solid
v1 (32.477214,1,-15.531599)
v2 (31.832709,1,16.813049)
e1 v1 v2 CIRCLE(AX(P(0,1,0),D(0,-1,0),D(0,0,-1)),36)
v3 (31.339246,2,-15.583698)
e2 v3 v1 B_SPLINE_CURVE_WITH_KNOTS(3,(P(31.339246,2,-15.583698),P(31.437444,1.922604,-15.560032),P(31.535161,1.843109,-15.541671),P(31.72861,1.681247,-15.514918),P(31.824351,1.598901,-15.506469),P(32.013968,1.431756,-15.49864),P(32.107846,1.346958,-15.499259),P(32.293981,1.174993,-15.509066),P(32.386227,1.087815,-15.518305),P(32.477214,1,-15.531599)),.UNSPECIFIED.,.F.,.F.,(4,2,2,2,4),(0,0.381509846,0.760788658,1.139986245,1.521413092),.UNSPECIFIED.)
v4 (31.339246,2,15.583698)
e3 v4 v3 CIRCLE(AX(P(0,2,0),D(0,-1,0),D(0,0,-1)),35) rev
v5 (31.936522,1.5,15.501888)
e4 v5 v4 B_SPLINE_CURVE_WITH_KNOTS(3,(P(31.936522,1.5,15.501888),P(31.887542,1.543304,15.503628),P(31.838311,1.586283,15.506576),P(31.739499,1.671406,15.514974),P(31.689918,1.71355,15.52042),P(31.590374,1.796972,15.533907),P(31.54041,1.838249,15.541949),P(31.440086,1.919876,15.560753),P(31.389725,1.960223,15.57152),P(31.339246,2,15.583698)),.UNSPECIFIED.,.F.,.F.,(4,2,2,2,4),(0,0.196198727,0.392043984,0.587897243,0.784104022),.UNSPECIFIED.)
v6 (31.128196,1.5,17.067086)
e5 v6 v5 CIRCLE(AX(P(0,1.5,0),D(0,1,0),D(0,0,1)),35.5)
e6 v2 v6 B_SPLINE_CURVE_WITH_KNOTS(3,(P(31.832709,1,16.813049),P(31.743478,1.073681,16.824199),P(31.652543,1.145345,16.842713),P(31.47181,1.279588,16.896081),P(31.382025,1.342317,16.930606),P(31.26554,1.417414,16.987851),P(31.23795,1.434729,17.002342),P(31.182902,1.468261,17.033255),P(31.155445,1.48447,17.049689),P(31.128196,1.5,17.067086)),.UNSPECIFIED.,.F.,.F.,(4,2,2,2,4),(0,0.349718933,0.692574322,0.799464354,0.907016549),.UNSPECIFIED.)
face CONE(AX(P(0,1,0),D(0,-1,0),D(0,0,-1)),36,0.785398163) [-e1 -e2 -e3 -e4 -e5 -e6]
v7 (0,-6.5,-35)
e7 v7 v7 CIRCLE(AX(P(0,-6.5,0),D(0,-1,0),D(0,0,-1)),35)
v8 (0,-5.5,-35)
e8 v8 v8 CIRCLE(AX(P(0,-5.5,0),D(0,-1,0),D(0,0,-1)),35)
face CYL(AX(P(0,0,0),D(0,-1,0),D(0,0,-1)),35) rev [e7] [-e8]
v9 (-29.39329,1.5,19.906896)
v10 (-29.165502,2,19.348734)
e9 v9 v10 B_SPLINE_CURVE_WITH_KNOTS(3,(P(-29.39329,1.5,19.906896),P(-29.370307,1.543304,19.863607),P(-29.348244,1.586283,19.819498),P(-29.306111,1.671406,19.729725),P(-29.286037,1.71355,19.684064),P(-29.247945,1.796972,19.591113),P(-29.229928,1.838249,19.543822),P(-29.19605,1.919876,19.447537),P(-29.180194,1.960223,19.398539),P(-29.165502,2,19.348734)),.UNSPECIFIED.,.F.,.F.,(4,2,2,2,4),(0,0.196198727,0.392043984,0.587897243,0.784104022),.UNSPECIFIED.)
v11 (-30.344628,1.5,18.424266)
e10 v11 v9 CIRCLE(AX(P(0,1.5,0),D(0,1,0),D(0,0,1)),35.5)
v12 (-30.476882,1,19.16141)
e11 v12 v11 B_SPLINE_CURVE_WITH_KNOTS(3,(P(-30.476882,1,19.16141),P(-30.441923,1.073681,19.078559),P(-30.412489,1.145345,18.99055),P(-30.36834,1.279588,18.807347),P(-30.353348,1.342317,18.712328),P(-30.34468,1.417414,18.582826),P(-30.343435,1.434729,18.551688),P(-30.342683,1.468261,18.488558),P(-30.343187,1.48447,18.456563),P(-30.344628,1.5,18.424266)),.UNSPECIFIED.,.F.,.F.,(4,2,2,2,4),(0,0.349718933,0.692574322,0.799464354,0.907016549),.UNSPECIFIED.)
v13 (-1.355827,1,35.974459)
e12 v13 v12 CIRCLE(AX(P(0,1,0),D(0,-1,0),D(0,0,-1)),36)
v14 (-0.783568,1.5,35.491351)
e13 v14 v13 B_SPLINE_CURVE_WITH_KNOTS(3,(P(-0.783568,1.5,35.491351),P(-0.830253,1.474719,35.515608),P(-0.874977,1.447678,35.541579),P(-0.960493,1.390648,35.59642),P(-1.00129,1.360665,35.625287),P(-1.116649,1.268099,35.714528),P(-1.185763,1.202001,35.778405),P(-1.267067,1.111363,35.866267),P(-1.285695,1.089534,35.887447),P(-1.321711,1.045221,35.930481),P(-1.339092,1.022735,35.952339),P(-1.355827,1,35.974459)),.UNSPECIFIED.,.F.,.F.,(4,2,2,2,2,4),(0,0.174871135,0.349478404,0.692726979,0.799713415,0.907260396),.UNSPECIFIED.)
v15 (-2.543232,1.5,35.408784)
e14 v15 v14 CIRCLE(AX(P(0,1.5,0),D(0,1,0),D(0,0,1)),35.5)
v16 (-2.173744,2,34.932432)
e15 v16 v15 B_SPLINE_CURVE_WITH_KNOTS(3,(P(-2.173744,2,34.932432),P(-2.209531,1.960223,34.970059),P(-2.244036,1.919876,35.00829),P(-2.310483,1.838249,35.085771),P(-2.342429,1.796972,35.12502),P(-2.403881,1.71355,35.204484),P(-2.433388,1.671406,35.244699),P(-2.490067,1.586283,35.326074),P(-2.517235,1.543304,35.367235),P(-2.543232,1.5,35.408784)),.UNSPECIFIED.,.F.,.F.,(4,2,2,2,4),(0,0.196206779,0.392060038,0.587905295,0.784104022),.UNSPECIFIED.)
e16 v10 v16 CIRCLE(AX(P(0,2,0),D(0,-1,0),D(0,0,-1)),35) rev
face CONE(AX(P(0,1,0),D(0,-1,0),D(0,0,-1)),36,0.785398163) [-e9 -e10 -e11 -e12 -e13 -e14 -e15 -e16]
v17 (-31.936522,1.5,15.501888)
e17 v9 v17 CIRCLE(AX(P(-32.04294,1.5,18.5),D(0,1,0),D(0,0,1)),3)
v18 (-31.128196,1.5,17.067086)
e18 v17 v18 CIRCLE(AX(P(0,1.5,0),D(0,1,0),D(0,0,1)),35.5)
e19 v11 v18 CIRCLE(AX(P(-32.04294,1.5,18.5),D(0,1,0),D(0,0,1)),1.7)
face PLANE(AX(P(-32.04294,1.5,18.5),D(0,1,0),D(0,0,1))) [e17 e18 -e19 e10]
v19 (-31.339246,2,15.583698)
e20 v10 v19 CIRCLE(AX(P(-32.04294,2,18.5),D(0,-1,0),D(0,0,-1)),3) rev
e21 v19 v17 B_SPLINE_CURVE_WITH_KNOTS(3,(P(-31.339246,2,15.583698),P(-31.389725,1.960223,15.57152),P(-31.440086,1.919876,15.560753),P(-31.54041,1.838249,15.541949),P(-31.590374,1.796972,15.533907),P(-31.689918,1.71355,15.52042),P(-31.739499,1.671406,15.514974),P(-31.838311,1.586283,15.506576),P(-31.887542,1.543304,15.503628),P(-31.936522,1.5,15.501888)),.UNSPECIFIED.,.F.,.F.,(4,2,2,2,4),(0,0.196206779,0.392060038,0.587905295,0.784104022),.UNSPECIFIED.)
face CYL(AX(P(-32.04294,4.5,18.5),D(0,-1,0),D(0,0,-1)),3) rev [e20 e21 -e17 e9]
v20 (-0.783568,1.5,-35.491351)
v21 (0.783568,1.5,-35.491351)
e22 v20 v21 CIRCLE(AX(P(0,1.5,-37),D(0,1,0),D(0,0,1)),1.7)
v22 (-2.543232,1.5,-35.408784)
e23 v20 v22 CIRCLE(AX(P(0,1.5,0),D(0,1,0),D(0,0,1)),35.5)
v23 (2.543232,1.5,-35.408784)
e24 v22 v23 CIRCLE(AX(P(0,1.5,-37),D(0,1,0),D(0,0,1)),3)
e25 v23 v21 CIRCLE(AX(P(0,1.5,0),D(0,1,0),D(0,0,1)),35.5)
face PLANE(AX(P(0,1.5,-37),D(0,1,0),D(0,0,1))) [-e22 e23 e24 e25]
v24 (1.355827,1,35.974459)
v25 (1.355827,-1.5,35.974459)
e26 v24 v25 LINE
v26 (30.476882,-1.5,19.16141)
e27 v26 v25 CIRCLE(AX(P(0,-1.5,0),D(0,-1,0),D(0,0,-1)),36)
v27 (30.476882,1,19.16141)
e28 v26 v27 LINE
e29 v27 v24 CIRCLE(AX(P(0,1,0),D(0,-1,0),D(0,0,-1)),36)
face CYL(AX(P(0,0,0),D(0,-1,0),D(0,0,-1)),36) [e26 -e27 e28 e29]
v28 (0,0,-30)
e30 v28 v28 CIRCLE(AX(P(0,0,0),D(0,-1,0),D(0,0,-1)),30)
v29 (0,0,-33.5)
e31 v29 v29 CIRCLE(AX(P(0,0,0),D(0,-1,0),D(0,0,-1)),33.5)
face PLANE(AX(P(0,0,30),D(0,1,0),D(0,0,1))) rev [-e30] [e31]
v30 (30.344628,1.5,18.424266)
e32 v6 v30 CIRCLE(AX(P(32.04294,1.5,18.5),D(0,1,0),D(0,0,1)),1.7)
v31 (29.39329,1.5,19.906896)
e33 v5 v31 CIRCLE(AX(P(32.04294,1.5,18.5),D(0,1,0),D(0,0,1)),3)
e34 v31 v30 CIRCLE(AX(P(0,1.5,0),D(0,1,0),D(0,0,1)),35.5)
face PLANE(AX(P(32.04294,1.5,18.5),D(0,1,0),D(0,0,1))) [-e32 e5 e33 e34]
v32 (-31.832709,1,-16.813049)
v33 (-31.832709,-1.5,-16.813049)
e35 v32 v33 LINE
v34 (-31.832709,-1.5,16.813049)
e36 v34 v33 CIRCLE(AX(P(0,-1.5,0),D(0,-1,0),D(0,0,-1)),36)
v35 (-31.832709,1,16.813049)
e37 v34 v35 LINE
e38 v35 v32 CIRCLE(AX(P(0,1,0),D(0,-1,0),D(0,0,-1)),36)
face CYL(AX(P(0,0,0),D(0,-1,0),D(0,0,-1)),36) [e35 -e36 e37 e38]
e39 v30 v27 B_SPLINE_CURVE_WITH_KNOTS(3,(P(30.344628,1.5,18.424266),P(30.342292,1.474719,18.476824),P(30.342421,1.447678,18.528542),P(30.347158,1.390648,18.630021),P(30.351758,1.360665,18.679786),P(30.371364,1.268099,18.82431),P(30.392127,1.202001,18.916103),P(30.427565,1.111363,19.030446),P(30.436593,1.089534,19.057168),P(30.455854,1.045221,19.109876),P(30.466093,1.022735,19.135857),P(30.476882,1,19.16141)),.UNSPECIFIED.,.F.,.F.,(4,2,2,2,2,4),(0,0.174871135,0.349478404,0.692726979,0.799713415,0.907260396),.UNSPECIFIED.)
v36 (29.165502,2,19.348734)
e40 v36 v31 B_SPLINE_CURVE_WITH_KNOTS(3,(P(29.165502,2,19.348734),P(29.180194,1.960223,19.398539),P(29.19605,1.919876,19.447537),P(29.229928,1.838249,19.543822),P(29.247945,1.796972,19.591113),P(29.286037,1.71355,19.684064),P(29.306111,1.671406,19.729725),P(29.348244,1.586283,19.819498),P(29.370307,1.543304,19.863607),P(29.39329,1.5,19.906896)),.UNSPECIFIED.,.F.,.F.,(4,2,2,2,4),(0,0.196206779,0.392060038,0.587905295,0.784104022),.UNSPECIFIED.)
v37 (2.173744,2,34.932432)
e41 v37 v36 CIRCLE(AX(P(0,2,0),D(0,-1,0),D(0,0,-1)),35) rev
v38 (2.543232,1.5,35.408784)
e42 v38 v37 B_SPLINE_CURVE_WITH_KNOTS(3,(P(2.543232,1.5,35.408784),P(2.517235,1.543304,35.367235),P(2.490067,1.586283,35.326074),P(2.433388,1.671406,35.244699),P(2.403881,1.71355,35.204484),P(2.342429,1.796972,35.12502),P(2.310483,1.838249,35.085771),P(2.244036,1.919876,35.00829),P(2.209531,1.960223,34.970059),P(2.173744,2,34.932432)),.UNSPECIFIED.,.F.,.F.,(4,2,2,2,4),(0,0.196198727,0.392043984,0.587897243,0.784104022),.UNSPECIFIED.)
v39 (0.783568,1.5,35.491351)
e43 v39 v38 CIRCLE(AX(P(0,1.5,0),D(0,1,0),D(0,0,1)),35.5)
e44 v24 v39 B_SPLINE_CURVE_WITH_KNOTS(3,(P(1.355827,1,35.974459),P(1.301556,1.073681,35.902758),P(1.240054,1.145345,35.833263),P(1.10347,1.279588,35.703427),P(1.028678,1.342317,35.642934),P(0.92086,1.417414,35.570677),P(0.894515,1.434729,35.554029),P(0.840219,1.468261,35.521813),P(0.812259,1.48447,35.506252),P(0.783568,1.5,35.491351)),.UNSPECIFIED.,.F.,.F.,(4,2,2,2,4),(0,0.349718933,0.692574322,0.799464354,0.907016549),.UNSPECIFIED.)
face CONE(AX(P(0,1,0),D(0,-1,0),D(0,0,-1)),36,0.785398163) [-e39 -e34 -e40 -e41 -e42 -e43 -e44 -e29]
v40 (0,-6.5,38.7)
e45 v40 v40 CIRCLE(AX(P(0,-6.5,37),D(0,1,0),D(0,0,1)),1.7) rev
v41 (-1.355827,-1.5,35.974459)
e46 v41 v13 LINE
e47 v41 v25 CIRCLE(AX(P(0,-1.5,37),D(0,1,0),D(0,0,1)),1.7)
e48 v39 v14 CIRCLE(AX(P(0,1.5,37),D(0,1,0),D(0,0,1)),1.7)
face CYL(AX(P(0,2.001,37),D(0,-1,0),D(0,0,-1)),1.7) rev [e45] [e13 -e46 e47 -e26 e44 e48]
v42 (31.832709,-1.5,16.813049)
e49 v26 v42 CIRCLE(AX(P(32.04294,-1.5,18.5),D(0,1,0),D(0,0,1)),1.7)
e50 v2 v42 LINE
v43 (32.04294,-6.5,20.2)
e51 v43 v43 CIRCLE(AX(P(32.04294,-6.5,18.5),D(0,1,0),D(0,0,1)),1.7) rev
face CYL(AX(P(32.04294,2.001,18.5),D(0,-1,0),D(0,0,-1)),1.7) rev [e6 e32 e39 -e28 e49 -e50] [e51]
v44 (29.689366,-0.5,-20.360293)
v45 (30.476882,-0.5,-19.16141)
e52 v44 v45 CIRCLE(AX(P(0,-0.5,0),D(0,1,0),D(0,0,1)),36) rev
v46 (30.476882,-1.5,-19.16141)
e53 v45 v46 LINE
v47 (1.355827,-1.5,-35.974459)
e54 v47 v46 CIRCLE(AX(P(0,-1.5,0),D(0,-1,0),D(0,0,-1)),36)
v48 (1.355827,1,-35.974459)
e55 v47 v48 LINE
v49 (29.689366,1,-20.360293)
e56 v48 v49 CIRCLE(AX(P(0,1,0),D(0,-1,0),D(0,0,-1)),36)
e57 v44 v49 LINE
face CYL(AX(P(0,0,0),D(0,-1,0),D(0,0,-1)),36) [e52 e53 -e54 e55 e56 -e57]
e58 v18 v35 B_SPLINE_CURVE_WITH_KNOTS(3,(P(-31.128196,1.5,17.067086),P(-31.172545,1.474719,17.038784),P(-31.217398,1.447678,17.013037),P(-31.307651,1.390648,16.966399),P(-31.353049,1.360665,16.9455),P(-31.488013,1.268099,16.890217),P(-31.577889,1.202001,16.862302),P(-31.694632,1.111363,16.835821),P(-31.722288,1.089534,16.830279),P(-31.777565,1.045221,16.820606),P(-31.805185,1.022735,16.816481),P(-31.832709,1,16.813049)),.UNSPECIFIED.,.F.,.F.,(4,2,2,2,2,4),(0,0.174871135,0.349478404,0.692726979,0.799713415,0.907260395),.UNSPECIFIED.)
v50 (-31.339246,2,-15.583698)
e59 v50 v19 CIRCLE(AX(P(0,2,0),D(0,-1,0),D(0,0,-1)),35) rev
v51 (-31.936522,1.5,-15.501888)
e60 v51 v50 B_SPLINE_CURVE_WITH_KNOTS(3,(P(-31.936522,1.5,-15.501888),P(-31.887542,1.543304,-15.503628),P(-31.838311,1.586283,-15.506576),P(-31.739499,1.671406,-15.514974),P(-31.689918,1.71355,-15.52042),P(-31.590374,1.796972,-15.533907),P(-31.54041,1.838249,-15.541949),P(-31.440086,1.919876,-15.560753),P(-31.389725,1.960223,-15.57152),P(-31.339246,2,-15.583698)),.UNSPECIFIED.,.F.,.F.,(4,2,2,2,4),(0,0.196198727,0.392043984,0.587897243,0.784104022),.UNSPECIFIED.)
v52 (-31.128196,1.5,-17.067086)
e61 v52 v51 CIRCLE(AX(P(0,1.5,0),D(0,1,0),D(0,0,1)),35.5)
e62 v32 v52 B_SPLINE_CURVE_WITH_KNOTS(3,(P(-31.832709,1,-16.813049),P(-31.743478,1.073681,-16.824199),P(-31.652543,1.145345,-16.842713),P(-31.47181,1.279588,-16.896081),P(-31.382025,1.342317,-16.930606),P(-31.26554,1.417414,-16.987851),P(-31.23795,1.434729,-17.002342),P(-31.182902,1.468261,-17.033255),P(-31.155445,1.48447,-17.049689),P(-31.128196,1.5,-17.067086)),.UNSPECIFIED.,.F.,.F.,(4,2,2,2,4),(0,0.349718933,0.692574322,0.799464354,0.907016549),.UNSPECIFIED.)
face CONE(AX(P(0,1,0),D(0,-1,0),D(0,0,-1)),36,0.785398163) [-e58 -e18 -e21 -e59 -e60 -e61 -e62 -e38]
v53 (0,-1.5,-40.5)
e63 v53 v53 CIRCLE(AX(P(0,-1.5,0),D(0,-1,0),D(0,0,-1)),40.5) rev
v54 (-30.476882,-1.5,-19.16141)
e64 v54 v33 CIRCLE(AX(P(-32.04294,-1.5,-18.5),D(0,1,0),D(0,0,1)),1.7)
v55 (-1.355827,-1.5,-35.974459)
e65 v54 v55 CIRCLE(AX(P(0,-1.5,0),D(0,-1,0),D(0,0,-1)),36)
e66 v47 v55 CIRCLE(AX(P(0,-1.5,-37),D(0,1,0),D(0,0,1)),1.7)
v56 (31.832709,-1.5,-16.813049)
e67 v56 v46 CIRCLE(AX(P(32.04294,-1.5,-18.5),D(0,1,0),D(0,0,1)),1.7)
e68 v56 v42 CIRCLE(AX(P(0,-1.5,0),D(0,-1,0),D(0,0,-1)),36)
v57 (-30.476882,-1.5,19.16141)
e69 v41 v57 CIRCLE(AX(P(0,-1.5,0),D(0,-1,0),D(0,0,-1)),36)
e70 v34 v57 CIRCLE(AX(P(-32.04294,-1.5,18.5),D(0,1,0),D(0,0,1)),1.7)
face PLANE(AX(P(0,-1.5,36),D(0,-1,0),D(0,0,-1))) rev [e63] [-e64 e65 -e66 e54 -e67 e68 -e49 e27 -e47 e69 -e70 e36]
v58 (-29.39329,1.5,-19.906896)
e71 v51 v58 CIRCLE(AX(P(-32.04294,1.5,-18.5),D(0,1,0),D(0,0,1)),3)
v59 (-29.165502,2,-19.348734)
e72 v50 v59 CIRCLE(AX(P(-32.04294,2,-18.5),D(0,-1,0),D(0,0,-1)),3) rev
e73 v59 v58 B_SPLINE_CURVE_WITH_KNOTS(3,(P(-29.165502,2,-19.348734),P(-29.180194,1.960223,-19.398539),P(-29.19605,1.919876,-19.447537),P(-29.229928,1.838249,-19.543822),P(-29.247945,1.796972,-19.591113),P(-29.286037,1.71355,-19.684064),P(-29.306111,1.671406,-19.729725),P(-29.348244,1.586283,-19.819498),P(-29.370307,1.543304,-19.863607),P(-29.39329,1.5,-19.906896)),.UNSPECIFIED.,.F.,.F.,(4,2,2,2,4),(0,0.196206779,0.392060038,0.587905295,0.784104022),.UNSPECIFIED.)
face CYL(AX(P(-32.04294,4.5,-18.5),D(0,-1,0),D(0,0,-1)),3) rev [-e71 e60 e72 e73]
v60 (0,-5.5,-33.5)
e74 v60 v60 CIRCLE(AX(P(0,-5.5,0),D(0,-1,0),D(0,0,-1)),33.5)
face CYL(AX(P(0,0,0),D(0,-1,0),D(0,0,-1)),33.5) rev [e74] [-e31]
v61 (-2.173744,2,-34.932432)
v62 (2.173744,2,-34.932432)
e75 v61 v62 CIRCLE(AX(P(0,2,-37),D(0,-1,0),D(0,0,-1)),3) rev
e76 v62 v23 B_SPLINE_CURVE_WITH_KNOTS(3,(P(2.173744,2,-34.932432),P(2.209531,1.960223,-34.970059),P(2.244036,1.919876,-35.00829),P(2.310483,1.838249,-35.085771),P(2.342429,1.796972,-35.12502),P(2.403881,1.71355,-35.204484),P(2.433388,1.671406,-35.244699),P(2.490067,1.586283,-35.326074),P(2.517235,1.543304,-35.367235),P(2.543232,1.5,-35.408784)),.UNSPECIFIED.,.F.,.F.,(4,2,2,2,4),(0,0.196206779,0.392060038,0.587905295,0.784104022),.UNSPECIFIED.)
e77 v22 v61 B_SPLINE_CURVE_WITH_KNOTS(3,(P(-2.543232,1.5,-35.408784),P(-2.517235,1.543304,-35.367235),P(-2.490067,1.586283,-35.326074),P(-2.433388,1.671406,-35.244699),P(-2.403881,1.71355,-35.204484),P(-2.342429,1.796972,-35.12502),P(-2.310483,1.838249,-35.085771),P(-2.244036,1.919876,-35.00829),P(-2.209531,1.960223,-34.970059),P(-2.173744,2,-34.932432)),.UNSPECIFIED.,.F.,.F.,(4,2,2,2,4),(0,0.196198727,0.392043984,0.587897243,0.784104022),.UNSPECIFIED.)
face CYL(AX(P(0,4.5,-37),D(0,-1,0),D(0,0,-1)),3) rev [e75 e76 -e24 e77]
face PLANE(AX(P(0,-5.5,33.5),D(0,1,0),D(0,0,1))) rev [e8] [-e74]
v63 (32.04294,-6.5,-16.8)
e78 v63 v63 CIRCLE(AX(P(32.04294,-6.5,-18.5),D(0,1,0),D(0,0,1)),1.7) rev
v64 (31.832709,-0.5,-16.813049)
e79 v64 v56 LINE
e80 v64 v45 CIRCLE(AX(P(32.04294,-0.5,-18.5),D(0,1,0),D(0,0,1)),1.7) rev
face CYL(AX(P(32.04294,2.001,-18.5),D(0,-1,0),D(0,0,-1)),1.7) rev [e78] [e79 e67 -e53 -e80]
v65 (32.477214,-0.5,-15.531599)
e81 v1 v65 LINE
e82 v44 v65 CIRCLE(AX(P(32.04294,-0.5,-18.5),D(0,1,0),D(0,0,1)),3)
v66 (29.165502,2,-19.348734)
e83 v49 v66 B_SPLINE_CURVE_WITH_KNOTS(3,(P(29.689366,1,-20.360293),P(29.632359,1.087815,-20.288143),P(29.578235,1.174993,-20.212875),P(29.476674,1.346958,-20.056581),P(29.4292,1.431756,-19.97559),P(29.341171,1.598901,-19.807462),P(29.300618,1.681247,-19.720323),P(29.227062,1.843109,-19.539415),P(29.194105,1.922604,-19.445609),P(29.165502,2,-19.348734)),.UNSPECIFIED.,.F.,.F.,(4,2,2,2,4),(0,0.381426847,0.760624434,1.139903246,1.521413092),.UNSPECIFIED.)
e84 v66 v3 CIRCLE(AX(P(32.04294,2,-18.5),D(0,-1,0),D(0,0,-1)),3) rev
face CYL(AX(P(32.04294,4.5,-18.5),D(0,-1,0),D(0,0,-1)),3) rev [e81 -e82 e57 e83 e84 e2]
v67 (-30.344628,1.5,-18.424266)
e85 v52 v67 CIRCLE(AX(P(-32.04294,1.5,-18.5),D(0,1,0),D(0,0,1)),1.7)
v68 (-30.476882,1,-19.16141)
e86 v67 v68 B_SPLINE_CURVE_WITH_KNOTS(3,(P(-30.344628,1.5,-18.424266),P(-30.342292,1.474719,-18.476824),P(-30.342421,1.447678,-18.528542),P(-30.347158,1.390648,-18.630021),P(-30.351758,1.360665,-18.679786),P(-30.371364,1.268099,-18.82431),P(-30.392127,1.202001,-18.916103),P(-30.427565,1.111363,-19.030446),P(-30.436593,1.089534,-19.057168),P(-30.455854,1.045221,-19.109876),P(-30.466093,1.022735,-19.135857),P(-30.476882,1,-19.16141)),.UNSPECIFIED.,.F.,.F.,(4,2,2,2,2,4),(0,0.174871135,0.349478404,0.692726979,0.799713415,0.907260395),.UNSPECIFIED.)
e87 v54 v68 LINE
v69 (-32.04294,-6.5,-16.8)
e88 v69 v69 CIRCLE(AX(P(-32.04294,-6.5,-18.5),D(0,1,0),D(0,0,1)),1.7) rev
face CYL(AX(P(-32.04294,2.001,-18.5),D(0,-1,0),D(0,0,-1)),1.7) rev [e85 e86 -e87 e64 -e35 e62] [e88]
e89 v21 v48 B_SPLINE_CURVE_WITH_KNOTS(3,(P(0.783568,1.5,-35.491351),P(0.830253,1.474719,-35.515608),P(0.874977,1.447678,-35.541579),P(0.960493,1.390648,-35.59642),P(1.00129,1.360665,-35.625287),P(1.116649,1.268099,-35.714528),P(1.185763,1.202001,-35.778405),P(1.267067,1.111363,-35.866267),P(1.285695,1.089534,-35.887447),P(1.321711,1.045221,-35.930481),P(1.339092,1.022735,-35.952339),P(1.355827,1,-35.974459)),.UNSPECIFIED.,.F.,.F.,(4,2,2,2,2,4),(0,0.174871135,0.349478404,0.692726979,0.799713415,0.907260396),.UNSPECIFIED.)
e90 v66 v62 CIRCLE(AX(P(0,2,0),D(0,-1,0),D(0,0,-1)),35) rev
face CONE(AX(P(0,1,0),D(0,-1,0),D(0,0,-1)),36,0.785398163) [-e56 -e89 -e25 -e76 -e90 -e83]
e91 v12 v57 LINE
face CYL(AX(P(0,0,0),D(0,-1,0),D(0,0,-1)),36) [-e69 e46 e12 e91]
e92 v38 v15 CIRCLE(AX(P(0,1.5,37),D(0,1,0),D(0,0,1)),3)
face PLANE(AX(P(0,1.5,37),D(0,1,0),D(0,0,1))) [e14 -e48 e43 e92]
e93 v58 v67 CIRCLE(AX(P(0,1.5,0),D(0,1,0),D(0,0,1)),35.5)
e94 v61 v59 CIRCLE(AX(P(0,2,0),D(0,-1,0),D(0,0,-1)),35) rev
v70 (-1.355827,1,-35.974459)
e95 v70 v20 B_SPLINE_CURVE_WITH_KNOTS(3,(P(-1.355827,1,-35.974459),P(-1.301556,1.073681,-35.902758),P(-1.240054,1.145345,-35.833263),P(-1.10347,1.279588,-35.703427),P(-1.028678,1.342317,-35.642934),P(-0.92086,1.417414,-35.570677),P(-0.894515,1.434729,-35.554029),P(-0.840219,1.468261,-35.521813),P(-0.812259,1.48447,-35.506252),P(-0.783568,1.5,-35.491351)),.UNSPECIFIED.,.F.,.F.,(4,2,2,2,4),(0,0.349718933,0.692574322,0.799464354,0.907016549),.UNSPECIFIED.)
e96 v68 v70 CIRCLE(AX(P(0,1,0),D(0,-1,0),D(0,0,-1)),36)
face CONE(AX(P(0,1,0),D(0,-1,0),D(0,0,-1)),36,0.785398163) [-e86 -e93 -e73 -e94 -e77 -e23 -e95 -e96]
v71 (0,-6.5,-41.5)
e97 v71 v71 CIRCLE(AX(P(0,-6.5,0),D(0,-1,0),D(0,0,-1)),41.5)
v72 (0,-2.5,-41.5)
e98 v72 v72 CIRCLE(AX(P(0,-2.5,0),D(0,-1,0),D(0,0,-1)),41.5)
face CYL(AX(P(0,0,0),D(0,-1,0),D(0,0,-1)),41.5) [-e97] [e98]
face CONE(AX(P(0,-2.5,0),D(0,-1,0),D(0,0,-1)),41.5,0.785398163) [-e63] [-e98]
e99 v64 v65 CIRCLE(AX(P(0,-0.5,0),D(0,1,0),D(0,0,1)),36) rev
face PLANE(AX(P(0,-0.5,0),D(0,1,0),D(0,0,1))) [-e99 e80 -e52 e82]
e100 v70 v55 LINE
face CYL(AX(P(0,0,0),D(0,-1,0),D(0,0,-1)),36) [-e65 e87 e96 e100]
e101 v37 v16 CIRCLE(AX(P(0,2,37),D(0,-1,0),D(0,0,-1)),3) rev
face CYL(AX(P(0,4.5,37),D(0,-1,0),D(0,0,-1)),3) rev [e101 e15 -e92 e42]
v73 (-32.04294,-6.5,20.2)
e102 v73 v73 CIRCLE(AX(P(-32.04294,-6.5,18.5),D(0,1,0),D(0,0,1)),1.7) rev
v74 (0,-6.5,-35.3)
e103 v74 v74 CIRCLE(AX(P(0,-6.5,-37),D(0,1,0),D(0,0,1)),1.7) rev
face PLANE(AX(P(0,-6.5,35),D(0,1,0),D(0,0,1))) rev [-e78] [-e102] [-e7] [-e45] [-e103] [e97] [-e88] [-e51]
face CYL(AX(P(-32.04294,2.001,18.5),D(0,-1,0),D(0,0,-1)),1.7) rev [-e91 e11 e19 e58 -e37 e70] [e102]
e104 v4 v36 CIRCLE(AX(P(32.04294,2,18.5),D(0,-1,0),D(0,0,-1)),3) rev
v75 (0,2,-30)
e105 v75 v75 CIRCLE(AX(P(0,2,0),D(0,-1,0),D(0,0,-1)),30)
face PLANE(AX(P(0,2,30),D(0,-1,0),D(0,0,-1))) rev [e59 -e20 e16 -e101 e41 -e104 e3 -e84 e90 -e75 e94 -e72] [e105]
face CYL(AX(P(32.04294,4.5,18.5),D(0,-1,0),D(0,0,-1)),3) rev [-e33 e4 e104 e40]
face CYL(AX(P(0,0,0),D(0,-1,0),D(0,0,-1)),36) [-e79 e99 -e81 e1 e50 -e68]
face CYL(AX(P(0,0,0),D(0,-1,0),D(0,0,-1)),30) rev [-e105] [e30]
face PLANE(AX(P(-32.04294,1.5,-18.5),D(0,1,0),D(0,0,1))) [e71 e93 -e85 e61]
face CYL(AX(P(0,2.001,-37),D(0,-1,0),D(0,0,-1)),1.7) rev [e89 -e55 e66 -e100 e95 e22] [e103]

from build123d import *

# Parameters (mm, degrees)
SKETCH_3_R                      = 1.7
CUT_EXTRUDE_1_DEPTH             = 10
CUT_EXTRUDE_1_DIRECTION_2_REACH = 60.902
CUT_EXTRUDE_START               = 3
SKETCH_4_R                      = 3
CUT_EXTRUDE_2_DEPTH             = 3
SKETCH_7_R                      = 3
CUT_EXTRUDE_3_DEPTH             = 10
EXTRUDE_1_DEPTH                 = 1
CHAMFER_1_SIZE                  = 1


with BuildPart() as part:
    # 草图2 → 旋转1 (revolve)
    with BuildSketch(Plane(origin=(0, 0, 0), x_dir=(0, 0, -1), z_dir=(1, 0, 0)), mode=Mode.PRIVATE) as revolve_1_sk:
        Polygon((-30, 0), (-30, 2), (-36, 2), (-36, -1.5), (-41.5, -1.5), (-41.5, -6.5), (-35, -6.5), (-35, -5.5), (-33.5, -5.5), (-33.5, 0), align=None)
    revolve(revolve_1_sk.sketch.rotate(Axis((0, 0, 0), (0, 1, 0)), 180), axis=Axis((0, 0, 0), (0, 1, 0)))

    # 草图3 → 切除-拉伸1 (cut)
    with BuildSketch(Plane(origin=(0, -1.5, 0), x_dir=(1, 0, 0), z_dir=(0, 1, 0))):
        with Locations(Location((0, 37, 0), (0, 0, 217.103674805))):
            Circle(SKETCH_3_R)
        with Locations(Location((32.04293994, 18.5, 0), (0, 0, 157.103674805))):
            Circle(SKETCH_3_R)
        with Locations(Location((32.04293994, -18.5, 0), (0, 0, 97.103674805))):
            Circle(SKETCH_3_R)
        with Locations(Location((0, -37, 0), (0, 0, 37.103674804))):
            Circle(SKETCH_3_R)
        with Locations(Location((-32.04293994, -18.5, 0), (0, 0, 82.896325196))):
            Circle(SKETCH_3_R)
        with Locations(Location((-32.04293994, 18.5, 0), (0, 0, 22.896325196))):
            Circle(SKETCH_3_R)
    extrude(amount=-CUT_EXTRUDE_1_DEPTH, mode=Mode.SUBTRACT)

    # 草图3 → 切除-拉伸1 direction 2 (cut, up to next)
    with BuildSketch(Plane(origin=(0, -1.5, 0), x_dir=(1, 0, 0), z_dir=(0, 1, 0)), mode=Mode.PRIVATE) as cut_extrude_1_direction_2_sk1:
        with Locations(Location((0, 37, 0), (0, 0, 217.103674805))):
            Circle(SKETCH_3_R)
    cut_extrude_1_direction_2_tool1 = extrude(cut_extrude_1_direction_2_sk1.sketch, amount=CUT_EXTRUDE_1_DIRECTION_2_REACH, mode=Mode.PRIVATE) & part.part
    # 草图3 → 切除-拉伸1 direction 2 (cut, up to next)
    with BuildSketch(Plane(origin=(0, -1.5, 0), x_dir=(1, 0, 0), z_dir=(0, 1, 0)), mode=Mode.PRIVATE) as cut_extrude_1_direction_2_sk2:
        with Locations(Location((32.04293994, 18.5, 0), (0, 0, 157.103674805))):
            Circle(SKETCH_3_R)
    cut_extrude_1_direction_2_tool2 = extrude(cut_extrude_1_direction_2_sk2.sketch, amount=CUT_EXTRUDE_1_DIRECTION_2_REACH, mode=Mode.PRIVATE) & part.part
    # 草图3 → 切除-拉伸1 direction 2 (cut, up to next)
    with BuildSketch(Plane(origin=(0, -1.5, 0), x_dir=(1, 0, 0), z_dir=(0, 1, 0)), mode=Mode.PRIVATE) as cut_extrude_1_direction_2_sk3:
        with Locations(Location((32.04293994, -18.5, 0), (0, 0, 97.103674805))):
            Circle(SKETCH_3_R)
    cut_extrude_1_direction_2_tool3 = extrude(cut_extrude_1_direction_2_sk3.sketch, amount=CUT_EXTRUDE_1_DIRECTION_2_REACH, mode=Mode.PRIVATE) & part.part
    # 草图3 → 切除-拉伸1 direction 2 (cut, up to next)
    with BuildSketch(Plane(origin=(0, -1.5, 0), x_dir=(1, 0, 0), z_dir=(0, 1, 0)), mode=Mode.PRIVATE) as cut_extrude_1_direction_2_sk4:
        with Locations(Location((0, -37, 0), (0, 0, 37.103674804))):
            Circle(SKETCH_3_R)
    cut_extrude_1_direction_2_tool4 = extrude(cut_extrude_1_direction_2_sk4.sketch, amount=CUT_EXTRUDE_1_DIRECTION_2_REACH, mode=Mode.PRIVATE) & part.part
    # 草图3 → 切除-拉伸1 direction 2 (cut, up to next)
    with BuildSketch(Plane(origin=(0, -1.5, 0), x_dir=(1, 0, 0), z_dir=(0, 1, 0)), mode=Mode.PRIVATE) as cut_extrude_1_direction_2_sk5:
        with Locations(Location((-32.04293994, -18.5, 0), (0, 0, 82.896325196))):
            Circle(SKETCH_3_R)
    cut_extrude_1_direction_2_tool5 = extrude(cut_extrude_1_direction_2_sk5.sketch, amount=CUT_EXTRUDE_1_DIRECTION_2_REACH, mode=Mode.PRIVATE) & part.part
    # 草图3 → 切除-拉伸1 direction 2 (cut, up to next)
    with BuildSketch(Plane(origin=(0, -1.5, 0), x_dir=(1, 0, 0), z_dir=(0, 1, 0)), mode=Mode.PRIVATE) as cut_extrude_1_direction_2_sk6:
        with Locations(Location((-32.04293994, 18.5, 0), (0, 0, 22.896325196))):
            Circle(SKETCH_3_R)
    cut_extrude_1_direction_2_tool6 = extrude(cut_extrude_1_direction_2_sk6.sketch, amount=CUT_EXTRUDE_1_DIRECTION_2_REACH, mode=Mode.PRIVATE) & part.part
    add(cut_extrude_1_direction_2_tool1.solids().sort_by_distance((0, -1.5, -37))[0], mode=Mode.SUBTRACT)
    add(cut_extrude_1_direction_2_tool2.solids().sort_by_distance((32.04294, -1.5, -18.5))[0], mode=Mode.SUBTRACT)
    add(cut_extrude_1_direction_2_tool3.solids().sort_by_distance((32.04294, -1.5, 18.5))[0], mode=Mode.SUBTRACT)
    add(cut_extrude_1_direction_2_tool4.solids().sort_by_distance((0, -1.5, 37))[0], mode=Mode.SUBTRACT)
    add(cut_extrude_1_direction_2_tool5.solids().sort_by_distance((-32.04294, -1.5, 18.5))[0], mode=Mode.SUBTRACT)
    add(cut_extrude_1_direction_2_tool6.solids().sort_by_distance((-32.04294, -1.5, -18.5))[0], mode=Mode.SUBTRACT)

    # 草图4 → 切除-拉伸2 (cut)
    with BuildSketch(Plane(origin=(0, -1.5, 0), x_dir=(1, 0, 0), z_dir=(0, 1, 0)).offset(CUT_EXTRUDE_START)):
        with Locations((0, 37)):
            Circle(SKETCH_4_R)
        with Locations((32.04293994, 18.5)):
            Circle(SKETCH_4_R)
        with Locations((32.04293994, -18.5)):
            Circle(SKETCH_4_R)
        with Locations((0, -37)):
            Circle(SKETCH_4_R)
        with Locations((-32.04293994, -18.5)):
            Circle(SKETCH_4_R)
        with Locations((-32.04293994, 18.5)):
            Circle(SKETCH_4_R)
    extrude(amount=CUT_EXTRUDE_2_DEPTH, mode=Mode.SUBTRACT)

    # 草图7 → 切除-拉伸3 (cut)
    with BuildSketch(Plane(origin=(0, -1.5, 0), x_dir=(1, 0, 0), z_dir=(0, 1, 0))):
        with Locations((32.04293994, 18.5)):
            Circle(SKETCH_7_R)
    extrude(amount=CUT_EXTRUDE_3_DEPTH, mode=Mode.SUBTRACT)

    # 草图8 → 凸台-拉伸1 (add)
    with BuildSketch(Plane(origin=(0, -1.5, 0), x_dir=(1, 0, 0), z_dir=(0, 1, 0))):
        with BuildLine():
            ThreePointArc((30.476882326, 19.161410274), (30.089095942, 19.764774357), (29.689366173, 20.360293128))
            ThreePointArc((29.689366173, 20.360293128), (29.444863729, 17), (32.477214164, 15.531598764))
            ThreePointArc((32.477214164, 15.531598764), (32.161344664, 16.175534285), (31.832709232, 16.813049186))
            ThreePointArc((31.832709232, 16.813049186), (30.570696754, 17.65), (30.476882326, 19.161410274))
        make_face()
    extrude(amount=EXTRUDE_1_DEPTH)

    # 倒角1
    # the kernel refuses this chamfer: 1 mm, written as the material it takes off along each edge
    with BuildSketch(Plane(origin=(0, 2, 0), x_dir=(0.00607290176343859, 0, 0.9999815597620647), z_dir=(-0.9999815597620647, 0, 0.00607290176343859))) as chamfer_1_piece_1:
        Polygon((36 - CHAMFER_1_SIZE, 0), (36, -CHAMFER_1_SIZE), (36, 0), align=None)
    revolve(axis=Axis((0, 2, 0), (0, 1, 0)), revolution_arc=59.304092442, mode=Mode.SUBTRACT)
    with BuildSketch(Plane(origin=(0, 2, 0), x_dir=(-0.8629729831882226, 0, 0.5052500670828455), z_dir=(-0.5052500670828455, 0, -0.8629729831882226))) as chamfer_1_piece_2:
        Polygon((36 - CHAMFER_1_SIZE, 0), (36, -CHAMFER_1_SIZE), (36, 0), align=None)
    revolve(axis=Axis((0, 2, 0), (0, 1, 0)), revolution_arc=59.304092442, mode=Mode.SUBTRACT)
    with BuildSketch(Plane(origin=(0, 2, 0), x_dir=(-0.8690458849516061, 0, -0.49473149267929145), z_dir=(0.49473149267929145, 0, -0.8690458849516061))) as chamfer_1_piece_3:
        Polygon((36 - CHAMFER_1_SIZE, 0), (36, -CHAMFER_1_SIZE), (36, 0), align=None)
    revolve(axis=Axis((0, 2, 0), (0, 1, 0)), revolution_arc=59.304092442, mode=Mode.SUBTRACT)
    with BuildSketch(Plane(origin=(0, 2, 0), x_dir=(-0.00607290176325947, 0, -0.9999815597620656), z_dir=(0.9999815597620656, 0, -0.00607290176325947))) as chamfer_1_piece_4:
        Polygon((36 - CHAMFER_1_SIZE, 0), (36, -CHAMFER_1_SIZE), (36, 0), align=None)
    revolve(axis=Axis((0, 2, 0), (0, 1, 0)), revolution_arc=59.304092442, mode=Mode.SUBTRACT)
    with BuildSketch(Plane(origin=(0, 2, 0), x_dir=(0.8629729831882953, 0, -0.5052500670827214), z_dir=(0.5052500670827214, 0, 0.8629729831882953))) as chamfer_1_piece_5:
        Polygon((36 - CHAMFER_1_SIZE, 0), (36, -CHAMFER_1_SIZE), (36, 0), align=None)
    revolve(axis=Axis((0, 2, 0), (0, 1, 0)), revolution_arc=59.304092442, mode=Mode.SUBTRACT)
    with BuildSketch(Plane(origin=(0, -1.5, 0), x_dir=(0, 0, -1), z_dir=(1, 0, 0))) as chamfer_1_piece_6:
        Polygon((41.5 - CHAMFER_1_SIZE, 0), (41.5, -CHAMFER_1_SIZE), (41.5, 0), align=None)
    revolve(axis=Axis((0, -1.5, 0), (0, 1, 0)), mode=Mode.SUBTRACT)
    with BuildSketch(Plane(origin=(0, 2, 0), x_dir=(0.8690458849516187, 0, 0.49473149267926925), z_dir=(-0.49473149267926925, 0, 0.8690458849516187))) as chamfer_1_piece_7:
        Polygon((36 - CHAMFER_1_SIZE, 0), (36, -CHAMFER_1_SIZE), (36, 0), align=None)
    revolve(axis=Axis((0, 2, 0), (0, 1, 0)), revolution_arc=59.304092442, mode=Mode.SUBTRACT)


solid = part.part
